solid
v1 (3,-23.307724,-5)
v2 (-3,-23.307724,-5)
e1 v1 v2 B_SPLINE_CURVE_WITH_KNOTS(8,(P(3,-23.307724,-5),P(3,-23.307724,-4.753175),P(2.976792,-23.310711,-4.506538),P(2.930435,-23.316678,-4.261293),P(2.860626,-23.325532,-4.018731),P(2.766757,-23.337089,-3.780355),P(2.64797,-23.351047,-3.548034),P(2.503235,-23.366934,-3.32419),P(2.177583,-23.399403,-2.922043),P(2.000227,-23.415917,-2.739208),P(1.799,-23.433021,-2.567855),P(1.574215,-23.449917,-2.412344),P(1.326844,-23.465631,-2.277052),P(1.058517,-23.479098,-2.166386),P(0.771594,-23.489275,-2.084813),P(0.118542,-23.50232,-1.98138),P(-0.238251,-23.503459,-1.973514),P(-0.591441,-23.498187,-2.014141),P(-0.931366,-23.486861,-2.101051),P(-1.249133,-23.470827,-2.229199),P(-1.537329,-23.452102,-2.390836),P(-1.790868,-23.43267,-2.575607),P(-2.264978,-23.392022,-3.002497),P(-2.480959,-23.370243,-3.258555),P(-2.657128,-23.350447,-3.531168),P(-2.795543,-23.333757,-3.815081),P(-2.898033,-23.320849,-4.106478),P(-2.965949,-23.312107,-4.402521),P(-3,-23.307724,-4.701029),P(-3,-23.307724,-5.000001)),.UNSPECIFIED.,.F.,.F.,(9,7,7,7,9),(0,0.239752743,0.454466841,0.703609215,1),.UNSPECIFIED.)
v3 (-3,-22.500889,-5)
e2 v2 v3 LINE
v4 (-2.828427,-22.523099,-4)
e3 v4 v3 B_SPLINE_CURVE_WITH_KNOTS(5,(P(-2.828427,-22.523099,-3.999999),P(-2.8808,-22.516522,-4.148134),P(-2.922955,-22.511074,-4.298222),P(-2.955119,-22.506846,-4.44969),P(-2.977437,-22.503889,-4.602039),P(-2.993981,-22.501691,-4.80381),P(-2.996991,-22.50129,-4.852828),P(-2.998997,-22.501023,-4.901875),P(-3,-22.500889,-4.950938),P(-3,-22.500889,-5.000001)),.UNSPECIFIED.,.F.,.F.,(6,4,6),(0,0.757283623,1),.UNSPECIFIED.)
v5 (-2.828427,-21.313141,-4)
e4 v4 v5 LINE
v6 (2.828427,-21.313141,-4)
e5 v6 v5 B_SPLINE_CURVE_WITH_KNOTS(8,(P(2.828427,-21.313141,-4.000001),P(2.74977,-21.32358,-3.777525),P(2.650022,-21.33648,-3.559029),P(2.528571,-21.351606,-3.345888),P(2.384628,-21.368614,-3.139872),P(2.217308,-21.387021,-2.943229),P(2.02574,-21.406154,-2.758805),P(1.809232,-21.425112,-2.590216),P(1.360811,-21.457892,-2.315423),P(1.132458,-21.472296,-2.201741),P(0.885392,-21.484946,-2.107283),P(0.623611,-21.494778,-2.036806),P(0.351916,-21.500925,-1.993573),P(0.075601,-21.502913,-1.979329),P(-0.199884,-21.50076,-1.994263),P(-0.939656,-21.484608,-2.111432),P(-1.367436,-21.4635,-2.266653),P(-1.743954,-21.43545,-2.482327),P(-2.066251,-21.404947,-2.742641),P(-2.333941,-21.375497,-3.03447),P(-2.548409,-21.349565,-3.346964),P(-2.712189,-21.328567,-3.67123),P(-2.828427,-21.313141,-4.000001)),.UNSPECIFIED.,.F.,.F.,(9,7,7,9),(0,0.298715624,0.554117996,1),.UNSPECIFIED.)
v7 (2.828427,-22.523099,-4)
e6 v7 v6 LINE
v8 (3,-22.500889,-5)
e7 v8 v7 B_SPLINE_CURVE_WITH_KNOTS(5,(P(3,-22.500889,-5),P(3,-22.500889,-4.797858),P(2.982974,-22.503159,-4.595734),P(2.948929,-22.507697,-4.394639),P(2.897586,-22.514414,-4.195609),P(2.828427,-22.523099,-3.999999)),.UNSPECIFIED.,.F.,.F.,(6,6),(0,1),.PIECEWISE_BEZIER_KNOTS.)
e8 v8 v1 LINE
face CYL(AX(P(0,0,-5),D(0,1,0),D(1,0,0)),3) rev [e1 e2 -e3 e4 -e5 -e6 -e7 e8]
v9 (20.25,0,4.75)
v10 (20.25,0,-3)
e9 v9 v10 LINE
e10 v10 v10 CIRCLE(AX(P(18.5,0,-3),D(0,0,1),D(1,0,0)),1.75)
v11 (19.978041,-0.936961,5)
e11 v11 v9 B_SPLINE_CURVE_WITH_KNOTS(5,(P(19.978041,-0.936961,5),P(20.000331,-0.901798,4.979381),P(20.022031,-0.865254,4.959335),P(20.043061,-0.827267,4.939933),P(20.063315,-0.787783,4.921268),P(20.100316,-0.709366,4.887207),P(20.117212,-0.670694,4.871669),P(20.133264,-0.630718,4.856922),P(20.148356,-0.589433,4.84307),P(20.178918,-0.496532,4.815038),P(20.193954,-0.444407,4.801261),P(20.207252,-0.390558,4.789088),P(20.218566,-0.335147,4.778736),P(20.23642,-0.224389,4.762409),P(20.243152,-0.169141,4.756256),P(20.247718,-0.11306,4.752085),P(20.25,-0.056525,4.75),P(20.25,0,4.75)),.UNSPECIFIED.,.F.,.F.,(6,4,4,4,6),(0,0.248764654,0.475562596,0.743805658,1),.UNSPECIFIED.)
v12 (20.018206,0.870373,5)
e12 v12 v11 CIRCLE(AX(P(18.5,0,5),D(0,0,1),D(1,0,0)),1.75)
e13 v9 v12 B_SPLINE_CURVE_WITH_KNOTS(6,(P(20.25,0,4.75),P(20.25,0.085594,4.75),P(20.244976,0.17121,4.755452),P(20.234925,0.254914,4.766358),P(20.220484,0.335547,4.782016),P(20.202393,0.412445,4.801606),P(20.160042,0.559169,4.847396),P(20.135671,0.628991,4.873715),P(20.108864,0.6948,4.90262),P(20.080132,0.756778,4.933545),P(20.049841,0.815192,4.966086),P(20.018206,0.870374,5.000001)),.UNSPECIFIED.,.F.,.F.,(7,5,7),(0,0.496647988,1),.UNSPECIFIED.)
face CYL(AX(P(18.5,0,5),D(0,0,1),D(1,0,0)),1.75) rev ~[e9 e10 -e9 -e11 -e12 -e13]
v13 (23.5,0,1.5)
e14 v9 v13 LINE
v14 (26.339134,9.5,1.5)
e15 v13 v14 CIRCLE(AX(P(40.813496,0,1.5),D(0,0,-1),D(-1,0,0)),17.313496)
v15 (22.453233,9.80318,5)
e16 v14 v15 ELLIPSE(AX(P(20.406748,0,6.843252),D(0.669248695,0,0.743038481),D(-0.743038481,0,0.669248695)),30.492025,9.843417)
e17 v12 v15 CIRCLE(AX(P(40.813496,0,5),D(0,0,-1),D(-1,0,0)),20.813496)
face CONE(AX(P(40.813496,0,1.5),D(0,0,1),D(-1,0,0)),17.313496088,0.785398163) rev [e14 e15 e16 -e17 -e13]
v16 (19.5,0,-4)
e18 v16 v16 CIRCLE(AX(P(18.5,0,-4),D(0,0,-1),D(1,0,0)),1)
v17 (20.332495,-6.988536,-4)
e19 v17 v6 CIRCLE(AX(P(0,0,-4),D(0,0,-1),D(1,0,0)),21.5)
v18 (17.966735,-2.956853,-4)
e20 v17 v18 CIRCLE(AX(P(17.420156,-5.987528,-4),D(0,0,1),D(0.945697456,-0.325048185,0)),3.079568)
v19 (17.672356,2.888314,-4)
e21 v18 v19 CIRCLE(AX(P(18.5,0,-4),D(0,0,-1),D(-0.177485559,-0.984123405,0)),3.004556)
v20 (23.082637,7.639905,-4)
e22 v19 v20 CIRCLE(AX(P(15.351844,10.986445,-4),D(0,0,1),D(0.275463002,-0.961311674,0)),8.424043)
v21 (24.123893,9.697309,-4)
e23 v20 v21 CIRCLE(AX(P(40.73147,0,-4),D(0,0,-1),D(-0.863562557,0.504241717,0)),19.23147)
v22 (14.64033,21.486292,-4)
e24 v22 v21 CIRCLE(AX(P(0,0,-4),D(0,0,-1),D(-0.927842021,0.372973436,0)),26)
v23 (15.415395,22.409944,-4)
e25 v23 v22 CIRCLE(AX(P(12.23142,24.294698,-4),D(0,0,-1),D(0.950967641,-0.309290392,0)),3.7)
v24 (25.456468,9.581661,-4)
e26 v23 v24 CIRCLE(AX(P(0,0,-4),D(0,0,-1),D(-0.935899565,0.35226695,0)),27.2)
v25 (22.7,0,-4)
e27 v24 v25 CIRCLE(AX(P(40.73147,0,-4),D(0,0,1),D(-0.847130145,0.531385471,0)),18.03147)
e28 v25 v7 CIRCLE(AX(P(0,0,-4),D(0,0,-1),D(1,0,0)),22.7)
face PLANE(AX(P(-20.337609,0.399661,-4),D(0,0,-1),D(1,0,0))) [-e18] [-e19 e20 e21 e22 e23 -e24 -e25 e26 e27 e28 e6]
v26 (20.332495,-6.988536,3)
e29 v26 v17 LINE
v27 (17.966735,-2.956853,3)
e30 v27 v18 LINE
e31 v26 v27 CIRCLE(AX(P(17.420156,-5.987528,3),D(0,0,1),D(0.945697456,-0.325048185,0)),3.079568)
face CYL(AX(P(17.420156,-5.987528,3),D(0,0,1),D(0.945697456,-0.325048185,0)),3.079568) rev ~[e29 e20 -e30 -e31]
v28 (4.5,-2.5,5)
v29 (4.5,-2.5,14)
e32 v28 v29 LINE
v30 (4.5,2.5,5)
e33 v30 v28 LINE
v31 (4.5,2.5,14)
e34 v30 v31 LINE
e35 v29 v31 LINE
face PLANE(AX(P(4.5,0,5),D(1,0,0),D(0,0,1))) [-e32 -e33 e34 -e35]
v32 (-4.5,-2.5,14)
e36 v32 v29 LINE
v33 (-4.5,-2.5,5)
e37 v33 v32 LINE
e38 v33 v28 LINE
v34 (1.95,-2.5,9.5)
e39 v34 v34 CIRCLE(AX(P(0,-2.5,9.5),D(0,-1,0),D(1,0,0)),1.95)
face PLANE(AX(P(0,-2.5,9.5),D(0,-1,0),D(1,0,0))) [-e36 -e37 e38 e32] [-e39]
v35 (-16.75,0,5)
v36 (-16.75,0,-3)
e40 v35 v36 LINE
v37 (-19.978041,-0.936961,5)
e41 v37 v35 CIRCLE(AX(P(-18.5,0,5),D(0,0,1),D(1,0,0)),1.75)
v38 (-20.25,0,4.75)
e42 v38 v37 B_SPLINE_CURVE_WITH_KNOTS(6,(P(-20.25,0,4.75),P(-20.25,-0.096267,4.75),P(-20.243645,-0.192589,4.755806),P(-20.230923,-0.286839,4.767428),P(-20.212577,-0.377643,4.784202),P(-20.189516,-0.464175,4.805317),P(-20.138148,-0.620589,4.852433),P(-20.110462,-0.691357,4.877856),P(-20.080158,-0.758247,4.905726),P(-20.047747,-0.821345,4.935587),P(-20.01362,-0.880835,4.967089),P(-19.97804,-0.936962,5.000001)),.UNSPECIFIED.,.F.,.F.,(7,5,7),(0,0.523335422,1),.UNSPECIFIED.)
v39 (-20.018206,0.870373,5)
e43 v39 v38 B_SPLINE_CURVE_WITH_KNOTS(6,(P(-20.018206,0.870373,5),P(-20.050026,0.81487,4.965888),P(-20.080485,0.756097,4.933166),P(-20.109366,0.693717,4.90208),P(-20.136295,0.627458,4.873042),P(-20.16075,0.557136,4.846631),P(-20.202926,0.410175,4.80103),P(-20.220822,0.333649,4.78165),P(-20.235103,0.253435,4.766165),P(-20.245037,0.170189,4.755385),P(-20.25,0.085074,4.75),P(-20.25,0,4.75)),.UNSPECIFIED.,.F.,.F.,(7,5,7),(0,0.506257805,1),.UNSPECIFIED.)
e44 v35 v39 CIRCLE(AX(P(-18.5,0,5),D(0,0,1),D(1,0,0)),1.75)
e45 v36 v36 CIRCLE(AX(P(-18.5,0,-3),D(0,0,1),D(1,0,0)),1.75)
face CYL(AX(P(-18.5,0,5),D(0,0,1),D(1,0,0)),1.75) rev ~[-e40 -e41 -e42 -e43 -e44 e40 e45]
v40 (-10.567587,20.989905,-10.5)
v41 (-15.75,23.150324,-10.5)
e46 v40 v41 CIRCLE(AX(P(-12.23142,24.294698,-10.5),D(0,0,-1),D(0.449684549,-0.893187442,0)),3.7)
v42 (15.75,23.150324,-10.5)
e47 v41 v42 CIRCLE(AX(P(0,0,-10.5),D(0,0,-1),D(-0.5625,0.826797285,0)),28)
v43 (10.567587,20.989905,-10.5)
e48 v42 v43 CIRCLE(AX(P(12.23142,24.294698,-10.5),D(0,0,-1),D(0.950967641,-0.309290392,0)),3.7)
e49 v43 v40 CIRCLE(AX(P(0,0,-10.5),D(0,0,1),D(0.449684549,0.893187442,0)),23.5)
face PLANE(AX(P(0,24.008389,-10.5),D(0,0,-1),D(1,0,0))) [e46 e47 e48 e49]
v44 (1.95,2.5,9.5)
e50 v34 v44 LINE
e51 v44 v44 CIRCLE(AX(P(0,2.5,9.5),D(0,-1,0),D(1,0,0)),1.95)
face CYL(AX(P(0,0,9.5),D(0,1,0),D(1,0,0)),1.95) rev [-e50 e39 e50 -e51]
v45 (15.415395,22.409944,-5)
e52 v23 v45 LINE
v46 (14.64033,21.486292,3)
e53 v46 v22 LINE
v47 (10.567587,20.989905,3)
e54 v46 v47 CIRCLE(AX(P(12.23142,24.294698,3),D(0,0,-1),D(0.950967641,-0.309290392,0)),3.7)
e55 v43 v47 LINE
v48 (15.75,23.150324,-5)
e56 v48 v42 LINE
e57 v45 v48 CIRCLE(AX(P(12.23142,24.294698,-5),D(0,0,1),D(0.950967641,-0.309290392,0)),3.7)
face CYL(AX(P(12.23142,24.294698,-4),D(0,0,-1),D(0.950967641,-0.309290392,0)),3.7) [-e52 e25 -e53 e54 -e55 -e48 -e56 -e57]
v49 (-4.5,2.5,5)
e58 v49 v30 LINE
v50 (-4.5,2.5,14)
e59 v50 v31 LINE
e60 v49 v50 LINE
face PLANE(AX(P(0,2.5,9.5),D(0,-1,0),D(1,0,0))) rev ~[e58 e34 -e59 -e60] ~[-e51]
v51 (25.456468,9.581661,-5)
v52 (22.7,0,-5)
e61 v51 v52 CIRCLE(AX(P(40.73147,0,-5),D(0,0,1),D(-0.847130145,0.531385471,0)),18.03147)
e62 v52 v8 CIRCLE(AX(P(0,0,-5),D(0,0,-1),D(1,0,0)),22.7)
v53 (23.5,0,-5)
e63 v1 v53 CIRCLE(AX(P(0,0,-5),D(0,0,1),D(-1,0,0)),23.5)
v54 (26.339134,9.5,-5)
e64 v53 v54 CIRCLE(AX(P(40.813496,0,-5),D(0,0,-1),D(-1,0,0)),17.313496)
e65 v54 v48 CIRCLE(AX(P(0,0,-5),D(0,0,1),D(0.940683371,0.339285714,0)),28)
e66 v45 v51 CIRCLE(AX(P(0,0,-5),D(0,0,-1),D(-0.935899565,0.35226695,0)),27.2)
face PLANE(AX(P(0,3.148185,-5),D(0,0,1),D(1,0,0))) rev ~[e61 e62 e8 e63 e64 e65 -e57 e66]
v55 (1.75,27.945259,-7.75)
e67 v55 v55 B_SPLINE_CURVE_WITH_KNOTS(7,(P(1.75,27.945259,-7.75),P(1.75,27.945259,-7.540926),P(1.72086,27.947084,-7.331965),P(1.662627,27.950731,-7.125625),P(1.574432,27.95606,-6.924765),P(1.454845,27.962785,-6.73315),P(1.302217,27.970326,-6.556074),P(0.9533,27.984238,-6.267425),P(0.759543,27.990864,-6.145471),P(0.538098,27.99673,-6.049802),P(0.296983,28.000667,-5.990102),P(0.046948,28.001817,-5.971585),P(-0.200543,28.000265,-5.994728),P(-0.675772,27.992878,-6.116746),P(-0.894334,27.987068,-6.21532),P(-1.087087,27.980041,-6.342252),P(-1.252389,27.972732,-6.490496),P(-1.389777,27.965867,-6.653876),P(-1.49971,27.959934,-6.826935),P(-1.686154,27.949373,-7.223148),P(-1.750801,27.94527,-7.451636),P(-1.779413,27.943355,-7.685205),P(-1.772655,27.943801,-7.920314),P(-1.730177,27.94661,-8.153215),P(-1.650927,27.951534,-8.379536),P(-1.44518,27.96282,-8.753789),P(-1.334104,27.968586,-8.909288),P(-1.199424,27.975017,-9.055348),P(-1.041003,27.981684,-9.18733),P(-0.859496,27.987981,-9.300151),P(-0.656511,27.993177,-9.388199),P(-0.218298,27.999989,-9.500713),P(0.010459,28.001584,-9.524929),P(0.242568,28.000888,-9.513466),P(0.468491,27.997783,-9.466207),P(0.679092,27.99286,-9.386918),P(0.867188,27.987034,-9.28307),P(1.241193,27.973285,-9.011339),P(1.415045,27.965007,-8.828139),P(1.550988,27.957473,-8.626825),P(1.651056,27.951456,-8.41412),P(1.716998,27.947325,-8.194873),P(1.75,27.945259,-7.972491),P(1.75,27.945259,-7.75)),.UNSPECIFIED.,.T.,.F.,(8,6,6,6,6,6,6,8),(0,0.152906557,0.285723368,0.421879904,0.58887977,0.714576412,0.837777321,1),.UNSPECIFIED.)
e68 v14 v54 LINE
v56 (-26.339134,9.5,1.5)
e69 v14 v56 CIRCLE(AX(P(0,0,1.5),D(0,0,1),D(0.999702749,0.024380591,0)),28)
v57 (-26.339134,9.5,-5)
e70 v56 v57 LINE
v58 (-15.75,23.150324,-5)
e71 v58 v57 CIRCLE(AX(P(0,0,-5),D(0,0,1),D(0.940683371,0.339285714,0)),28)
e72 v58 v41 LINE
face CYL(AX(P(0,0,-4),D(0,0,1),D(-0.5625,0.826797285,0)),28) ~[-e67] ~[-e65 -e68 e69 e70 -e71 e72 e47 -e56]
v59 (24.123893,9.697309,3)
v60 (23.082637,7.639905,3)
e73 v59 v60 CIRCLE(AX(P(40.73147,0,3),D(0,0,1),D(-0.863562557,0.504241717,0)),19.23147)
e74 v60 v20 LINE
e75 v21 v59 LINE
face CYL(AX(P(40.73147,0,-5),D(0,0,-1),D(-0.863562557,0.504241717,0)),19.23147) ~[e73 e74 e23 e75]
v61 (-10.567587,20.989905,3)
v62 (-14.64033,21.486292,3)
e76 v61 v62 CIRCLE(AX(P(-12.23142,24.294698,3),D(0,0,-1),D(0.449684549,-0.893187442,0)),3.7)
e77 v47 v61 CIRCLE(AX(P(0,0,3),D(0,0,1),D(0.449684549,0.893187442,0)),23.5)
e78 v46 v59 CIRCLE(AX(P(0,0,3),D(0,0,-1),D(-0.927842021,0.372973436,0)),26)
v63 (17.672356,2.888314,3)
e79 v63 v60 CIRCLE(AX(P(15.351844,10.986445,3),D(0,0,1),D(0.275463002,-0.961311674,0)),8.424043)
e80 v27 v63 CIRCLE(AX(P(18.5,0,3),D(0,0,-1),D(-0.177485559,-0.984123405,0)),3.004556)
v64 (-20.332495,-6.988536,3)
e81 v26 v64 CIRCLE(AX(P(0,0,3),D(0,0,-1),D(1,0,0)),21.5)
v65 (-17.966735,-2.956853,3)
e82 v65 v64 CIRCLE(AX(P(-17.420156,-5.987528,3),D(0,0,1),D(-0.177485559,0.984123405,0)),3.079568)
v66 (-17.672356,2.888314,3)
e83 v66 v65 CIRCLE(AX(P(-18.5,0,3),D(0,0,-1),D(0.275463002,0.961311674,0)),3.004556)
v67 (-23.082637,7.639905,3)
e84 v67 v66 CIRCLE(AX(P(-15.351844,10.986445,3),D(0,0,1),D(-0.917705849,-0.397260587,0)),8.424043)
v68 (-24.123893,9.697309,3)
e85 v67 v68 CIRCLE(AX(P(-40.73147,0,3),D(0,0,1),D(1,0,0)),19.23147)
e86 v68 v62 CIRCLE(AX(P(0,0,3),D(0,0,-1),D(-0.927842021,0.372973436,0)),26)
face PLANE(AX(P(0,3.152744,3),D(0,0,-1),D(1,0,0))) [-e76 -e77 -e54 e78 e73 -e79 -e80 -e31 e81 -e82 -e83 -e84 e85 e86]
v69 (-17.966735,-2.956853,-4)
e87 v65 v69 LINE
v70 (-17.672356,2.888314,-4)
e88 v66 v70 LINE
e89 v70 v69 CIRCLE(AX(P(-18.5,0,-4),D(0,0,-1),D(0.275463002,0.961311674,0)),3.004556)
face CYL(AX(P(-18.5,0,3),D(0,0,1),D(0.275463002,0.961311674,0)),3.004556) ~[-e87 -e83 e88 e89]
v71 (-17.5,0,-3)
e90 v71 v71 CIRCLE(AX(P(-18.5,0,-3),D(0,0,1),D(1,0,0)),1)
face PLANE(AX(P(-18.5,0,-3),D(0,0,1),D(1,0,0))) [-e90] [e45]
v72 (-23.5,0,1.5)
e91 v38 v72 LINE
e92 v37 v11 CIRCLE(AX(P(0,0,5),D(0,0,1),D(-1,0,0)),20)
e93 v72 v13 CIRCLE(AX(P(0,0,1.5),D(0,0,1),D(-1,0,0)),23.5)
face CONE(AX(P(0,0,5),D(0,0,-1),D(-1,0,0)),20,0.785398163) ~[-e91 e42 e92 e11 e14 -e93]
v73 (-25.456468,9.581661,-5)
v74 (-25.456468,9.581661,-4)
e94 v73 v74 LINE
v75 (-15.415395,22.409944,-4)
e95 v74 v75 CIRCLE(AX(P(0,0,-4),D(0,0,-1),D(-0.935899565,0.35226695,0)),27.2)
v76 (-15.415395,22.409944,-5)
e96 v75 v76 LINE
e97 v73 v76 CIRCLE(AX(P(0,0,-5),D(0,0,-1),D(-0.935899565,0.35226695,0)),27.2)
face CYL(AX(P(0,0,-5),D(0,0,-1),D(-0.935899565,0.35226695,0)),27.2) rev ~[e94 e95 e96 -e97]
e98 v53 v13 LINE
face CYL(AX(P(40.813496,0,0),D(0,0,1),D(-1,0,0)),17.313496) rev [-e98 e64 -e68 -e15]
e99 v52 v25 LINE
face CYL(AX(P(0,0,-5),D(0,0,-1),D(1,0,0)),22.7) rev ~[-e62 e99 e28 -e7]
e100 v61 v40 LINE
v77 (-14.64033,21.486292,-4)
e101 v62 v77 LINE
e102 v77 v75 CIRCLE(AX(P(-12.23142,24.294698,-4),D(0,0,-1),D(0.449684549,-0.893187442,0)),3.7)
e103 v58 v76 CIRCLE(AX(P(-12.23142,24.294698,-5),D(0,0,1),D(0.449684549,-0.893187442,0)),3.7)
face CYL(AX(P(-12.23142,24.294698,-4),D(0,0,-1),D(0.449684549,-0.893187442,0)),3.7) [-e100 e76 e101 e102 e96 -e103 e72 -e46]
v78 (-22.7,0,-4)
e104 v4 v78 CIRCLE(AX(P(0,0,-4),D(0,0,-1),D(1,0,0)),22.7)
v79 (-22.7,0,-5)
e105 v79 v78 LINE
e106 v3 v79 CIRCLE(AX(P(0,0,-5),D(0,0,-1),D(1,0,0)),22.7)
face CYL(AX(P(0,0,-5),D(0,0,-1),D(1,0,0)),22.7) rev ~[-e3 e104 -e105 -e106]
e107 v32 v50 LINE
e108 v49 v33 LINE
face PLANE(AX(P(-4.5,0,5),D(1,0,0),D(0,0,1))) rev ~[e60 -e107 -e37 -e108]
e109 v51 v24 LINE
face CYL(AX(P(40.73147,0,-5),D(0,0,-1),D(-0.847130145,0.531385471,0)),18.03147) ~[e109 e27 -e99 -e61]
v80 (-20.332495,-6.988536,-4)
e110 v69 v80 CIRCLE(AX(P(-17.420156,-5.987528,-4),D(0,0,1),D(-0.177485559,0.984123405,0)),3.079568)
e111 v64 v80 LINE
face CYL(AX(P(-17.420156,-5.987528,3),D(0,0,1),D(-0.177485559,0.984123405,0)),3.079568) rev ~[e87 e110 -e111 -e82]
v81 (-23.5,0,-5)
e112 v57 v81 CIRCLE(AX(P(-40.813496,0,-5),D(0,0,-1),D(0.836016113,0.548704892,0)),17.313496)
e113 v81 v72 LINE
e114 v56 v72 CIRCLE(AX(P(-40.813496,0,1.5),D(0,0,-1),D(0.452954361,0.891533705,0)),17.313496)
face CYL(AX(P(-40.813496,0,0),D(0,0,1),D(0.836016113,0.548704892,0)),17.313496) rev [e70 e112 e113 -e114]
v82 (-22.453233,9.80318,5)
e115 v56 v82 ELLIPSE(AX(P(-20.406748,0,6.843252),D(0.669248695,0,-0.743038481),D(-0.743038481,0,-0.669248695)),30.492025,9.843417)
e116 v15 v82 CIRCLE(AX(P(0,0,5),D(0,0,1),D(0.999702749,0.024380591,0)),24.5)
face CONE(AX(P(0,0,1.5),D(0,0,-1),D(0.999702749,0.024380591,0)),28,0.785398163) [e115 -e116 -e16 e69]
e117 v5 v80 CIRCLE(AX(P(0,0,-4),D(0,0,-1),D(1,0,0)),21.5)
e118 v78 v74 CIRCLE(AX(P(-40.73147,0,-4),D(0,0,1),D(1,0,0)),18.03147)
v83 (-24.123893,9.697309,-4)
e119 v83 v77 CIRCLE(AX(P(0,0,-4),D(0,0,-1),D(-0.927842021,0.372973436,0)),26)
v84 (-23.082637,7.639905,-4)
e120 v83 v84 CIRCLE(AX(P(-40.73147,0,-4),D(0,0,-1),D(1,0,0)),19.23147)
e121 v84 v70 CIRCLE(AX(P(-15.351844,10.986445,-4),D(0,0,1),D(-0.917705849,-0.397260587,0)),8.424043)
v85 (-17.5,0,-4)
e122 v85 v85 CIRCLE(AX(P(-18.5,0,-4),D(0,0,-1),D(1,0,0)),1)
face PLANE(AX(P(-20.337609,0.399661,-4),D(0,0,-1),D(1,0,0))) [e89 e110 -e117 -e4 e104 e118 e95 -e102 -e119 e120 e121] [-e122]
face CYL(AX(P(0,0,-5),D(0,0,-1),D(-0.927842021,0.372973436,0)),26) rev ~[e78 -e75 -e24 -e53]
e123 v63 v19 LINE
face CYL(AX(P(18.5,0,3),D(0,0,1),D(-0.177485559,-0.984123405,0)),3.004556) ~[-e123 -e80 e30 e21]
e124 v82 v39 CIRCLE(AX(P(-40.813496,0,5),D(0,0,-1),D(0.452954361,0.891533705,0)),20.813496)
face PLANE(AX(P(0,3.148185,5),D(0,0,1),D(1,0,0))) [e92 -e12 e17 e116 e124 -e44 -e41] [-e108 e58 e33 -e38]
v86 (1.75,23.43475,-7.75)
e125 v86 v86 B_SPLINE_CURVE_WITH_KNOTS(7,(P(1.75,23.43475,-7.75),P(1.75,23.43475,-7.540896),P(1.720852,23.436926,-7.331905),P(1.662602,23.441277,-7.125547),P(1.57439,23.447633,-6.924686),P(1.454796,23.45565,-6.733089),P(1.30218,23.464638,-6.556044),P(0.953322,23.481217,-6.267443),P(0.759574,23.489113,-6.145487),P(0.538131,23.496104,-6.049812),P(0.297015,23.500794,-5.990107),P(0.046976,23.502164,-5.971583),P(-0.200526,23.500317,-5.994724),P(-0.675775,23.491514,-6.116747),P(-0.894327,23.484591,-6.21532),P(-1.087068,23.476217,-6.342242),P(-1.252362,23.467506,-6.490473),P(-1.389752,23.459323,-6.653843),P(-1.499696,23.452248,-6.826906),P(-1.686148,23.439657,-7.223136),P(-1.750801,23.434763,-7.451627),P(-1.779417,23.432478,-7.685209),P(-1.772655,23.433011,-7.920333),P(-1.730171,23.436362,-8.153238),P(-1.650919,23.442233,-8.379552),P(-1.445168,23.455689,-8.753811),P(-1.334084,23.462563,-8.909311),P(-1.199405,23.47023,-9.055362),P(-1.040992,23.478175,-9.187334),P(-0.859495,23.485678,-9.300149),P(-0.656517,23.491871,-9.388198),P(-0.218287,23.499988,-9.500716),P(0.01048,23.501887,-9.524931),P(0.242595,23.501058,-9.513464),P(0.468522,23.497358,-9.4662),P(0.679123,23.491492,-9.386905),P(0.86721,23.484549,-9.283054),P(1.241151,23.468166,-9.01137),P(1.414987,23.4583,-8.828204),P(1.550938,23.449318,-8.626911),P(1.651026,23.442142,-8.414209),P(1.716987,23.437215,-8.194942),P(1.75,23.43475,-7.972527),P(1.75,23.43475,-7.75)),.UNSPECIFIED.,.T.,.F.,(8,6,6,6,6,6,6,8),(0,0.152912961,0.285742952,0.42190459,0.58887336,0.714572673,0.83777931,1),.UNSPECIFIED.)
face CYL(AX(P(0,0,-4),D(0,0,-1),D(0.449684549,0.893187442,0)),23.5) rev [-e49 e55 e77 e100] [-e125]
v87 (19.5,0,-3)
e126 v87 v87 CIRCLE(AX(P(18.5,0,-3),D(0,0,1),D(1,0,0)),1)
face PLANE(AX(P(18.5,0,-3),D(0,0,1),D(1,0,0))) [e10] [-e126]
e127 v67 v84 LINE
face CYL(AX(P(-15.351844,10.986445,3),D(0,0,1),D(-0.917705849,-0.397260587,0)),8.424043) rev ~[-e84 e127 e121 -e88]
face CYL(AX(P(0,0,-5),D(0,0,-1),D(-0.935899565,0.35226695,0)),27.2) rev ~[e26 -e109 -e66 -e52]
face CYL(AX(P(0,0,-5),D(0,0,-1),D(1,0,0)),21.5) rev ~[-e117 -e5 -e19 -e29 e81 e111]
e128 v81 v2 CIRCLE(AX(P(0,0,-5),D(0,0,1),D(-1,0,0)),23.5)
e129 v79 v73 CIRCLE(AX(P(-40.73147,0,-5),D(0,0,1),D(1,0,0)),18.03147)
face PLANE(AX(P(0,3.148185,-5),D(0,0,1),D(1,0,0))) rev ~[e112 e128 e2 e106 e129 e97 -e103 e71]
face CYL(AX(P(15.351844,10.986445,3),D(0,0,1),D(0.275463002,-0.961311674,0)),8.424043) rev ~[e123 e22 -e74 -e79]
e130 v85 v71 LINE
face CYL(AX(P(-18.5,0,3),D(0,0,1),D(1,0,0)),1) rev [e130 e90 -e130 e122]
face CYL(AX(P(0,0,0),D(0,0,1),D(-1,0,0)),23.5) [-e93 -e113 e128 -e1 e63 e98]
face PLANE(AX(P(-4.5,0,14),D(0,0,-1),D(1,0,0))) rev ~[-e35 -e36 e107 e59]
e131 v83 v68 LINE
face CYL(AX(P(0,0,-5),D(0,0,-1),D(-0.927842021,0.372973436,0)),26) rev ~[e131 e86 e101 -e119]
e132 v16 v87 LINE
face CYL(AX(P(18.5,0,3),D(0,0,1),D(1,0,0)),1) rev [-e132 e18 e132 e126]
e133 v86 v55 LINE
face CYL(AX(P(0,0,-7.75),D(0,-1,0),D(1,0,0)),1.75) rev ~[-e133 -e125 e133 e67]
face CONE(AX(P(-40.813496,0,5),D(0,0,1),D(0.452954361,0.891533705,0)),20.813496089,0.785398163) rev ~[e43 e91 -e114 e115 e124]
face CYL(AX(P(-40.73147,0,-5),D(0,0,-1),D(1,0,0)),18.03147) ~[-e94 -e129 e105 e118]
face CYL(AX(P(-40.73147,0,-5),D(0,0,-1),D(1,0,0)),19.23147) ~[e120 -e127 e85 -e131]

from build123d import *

# Parameters (mm, degrees)
F0_R         = 1
F1_DEPTH     = 5
F3_DEPTH     = 8
F5_DEPTH     = 1
F6_R         = 1
F7_DEPTH     = 7
F8_R         = 1.75
F9_DEPTH     = 8
F10_R        = 3
F11_DEPTH    = 23.501
F12_W        = 9
F12_H        = 9
F12_R        = 1.95
F13_DEPTH    = 2.5
F16_DEPTH    = 6.5
F17_DEPTH    = 7
F18_R        = 1.75
F19_DEPTH    = 28.001
F20_T2_ANGLE = 180
F20_T4_ANGLE = 63.0666087428
F20_T6_ANGLE = 177.2059132033
F20_T8_ANGLE = 63.0666087428


# Not quite as in the source:
# - a fillet or chamfer that OpenCascade refuses, or shapes differently, is made with other operations: its cross-section is extruded or revolved along the edge and cut away or added


with BuildPart() as f1:
    # F0 (on Top) → F1 (new body, symmetric)
    with BuildSketch(Plane.XY):
        with BuildLine():
            ThreePointArc((-26.3391343821, 9.5), (-24.2249616205, 4.9575872166), (-23.5, 0))
            ThreePointArc((-23.5, 0), (0, -23.5), (23.5, 0))
            ThreePointArc((23.5, 0), (24.2249616205, 4.9575872166), (26.3391343821, 9.5))
            ThreePointArc((26.3391343821, 9.5), (0, 28), (-26.3391343821, 9.5))
        make_face()
        with Locations((-18.5, 0)):
            Circle(F0_R, mode=Mode.SUBTRACT)
        with Locations((18.5, 0)):
            Circle(F0_R, mode=Mode.SUBTRACT)
    extrude(amount=F1_DEPTH, both=True)

    # F2 (on face) → F3 (cut)
    with BuildSketch(Plane(origin=(0, 0, -5), x_dir=(1, 0, 0), z_dir=(0, 0, -1))):
        with BuildLine():
            ThreePointArc((21.5, 0), (0, 21.5), (-21.5, 0))
            ThreePointArc((-21.5, 0), (-22.1675592341, -5.0230125511), (-24.12389255, -9.6973093298))
            ThreePointArc((-24.12389255, -9.6973093298), (0, -26), (24.12389255, -9.6973093298))
            ThreePointArc((24.12389255, -9.6973093298), (22.1675592341, -5.023012551), (21.5, 0))
        make_face()
    extrude(amount=-F3_DEPTH, mode=Mode.SUBTRACT)

    # F4 (on face) → F5 (cut)
    with BuildSketch(Plane(origin=(0, 0, -5), x_dir=(1, 0, 0), z_dir=(0, 0, -1))):
        with BuildLine():
            ThreePointArc((22.7, 0), (0, 22.7), (-22.7, 0))
            ThreePointArc((-22.7, 0), (-23.4028138558, -4.9851365308), (-25.4564681735, -9.5816610319))
            ThreePointArc((-25.4564681735, -9.5816610319), (0, -27.2), (25.4564681736, -9.5816610318))
            ThreePointArc((25.4564681736, -9.5816610318), (23.4028138558, -4.9851365307), (22.7, 0))
        make_face()
    extrude(amount=-F5_DEPTH, mode=Mode.SUBTRACT)

    # F6 (on face) → F7 (join, through all)
    with BuildSketch(Plane(origin=(0, 0, 3), x_dir=(1, 0, 0), z_dir=(0, 0, -1))):
        with BuildLine():
            ThreePointArc((-17.6723561014, -2.888314352), (-15.4992475751, 0.1511261164), (-17.9667347728, 2.9568534655))
            ThreePointArc((-17.9667347728, 2.9568534655), (-20.0762140714, 4.428973477), (-20.3324952956, 6.9885359735))
            ThreePointArc((-20.3324952956, 6.9885359735), (-22.8497447738, -0.1109553271), (-23.0826374703, -7.6399049653))
            ThreePointArc((-23.0826374703, -7.6399049653), (-20.9107637858, -4.6569183518), (-17.6723561014, -2.888314352))
        make_face()
        with Locations((-18.5, 0)):
            Circle(F6_R, mode=Mode.SUBTRACT)
        with BuildLine():
            ThreePointArc((20.3324952956, 6.9885359735), (20.0762140714, 4.428973477), (17.9667347728, 2.9568534655))
            ThreePointArc((17.9667347728, 2.9568534655), (15.4992475751, 0.1511261164), (17.6723561014, -2.888314352))
            ThreePointArc((17.6723561014, -2.888314352), (20.9107637858, -4.6569183518), (23.0826374703, -7.6399049653))
            ThreePointArc((23.0826374703, -7.6399049653), (22.9151781731, -0.0986538692), (20.3324952956, 6.9885359735))
        make_face()
        with Locations((18.5, 0)):
            Circle(F6_R, mode=Mode.SUBTRACT)
    extrude(amount=F7_DEPTH)

    # F8 (on face) → F9 (cut)
    with BuildSketch(Plane.XY.offset(5)):
        with Locations((-18.5, 0)):
            Circle(F8_R)
        with Locations((18.5, 0)):
            Circle(F8_R)
    extrude(amount=-F9_DEPTH, mode=Mode.SUBTRACT)

    # F10 (on Front) → F11 (cut, through all)
    with BuildSketch(Plane.XZ):
        with Locations((0, -5)):
            Circle(F10_R)
    extrude(amount=F11_DEPTH, mode=Mode.SUBTRACT)

    # F12 (on Front) → F13 (join, symmetric)
    with BuildSketch(Plane.XZ):
        with Locations((0, 9.5)):
            Rectangle(F12_W, F12_H)
        with Locations((0, 9.5)):
            Circle(F12_R, mode=Mode.SUBTRACT)
    extrude(amount=F13_DEPTH, both=True)

    # F15 (on face) → F16 (join)
    with BuildSketch(Plane(origin=(0, 0, -4), x_dir=(1, 0, 0), z_dir=(0, 0, -1))):
        with BuildLine():
            ThreePointArc((10.5675868988, -20.9899048863), (0, -23.5), (-10.5675868988, -20.9899048863))
            ThreePointArc((-10.5675868988, -20.9899048863), (-13.6551032171, -20.8795666046), (-15.75, -23.1503239718))
            ThreePointArc((-15.75, -23.1503239718), (0, -28), (15.75, -23.1503239718))
            ThreePointArc((15.75, -23.1503239718), (13.6551032171, -20.8795666046), (10.5675868988, -20.9899048863))
        make_face()
    extrude(amount=F16_DEPTH)

    # F15 (on face) → F17 (join, through all)
    with BuildSketch(Plane(origin=(0, 0, -4), x_dir=(1, 0, 0), z_dir=(0, 0, -1))):
        with BuildLine():
            ThreePointArc((10.5675868988, -20.9899048863), (0, -23.5), (-10.5675868988, -20.9899048863))
            ThreePointArc((-10.5675868988, -20.9899048863), (-13.6551032171, -20.8795666046), (-15.75, -23.1503239718))
            ThreePointArc((-15.75, -23.1503239718), (0, -28), (15.75, -23.1503239718))
            ThreePointArc((15.75, -23.1503239718), (13.6551032171, -20.8795666046), (10.5675868988, -20.9899048863))
        make_face()
    extrude(amount=-F17_DEPTH)

    # F18 (on Front) → F19 (cut, through all)
    with BuildSketch(Plane.XZ):
        with Locations((0, -7.75)):
            Circle(F18_R)
    extrude(amount=-F19_DEPTH, mode=Mode.SUBTRACT)

    # F20: chamfer of 3.5 on 4 edges, made by hand

    # F20_s1 → F20_t2 (revolve, cut)
    with BuildSketch(Plane.XZ):
        Polygon((-20, 5), (-23.5, 1.5), (-23.5, 5), align=None)
    revolve(axis=Axis((0, 0, 5), (0, 0, 1)), revolution_arc=F20_T2_ANGLE, mode=Mode.SUBTRACT)

    # F20_s3 → F20_t4 (revolve, cut)
    with BuildSketch(Plane.XZ):
        Polygon((23.5, 1.5), (20, 5), (23.5, 5), align=None)
    revolve(axis=Axis((40.8134960885, 0, 5), (0, 0, -1)), revolution_arc=F20_T4_ANGLE, mode=Mode.SUBTRACT)

    # F20_s5 → F20_t6 (revolve, cut)
    with BuildSketch(Plane(origin=(0, 0, 0), x_dir=(0, 0, 1), z_dir=(0.0243805911, -0.9997027492, 0))):
        Polygon((1.5, -28), (5, -24.5), (5, -28), align=None)
    revolve(axis=Axis((0, 0, 5), (0, 0, 1)), revolution_arc=F20_T6_ANGLE, mode=Mode.SUBTRACT)

    # F20_s7 → F20_t8 (revolve, cut)
    with BuildSketch(Plane(origin=(-32.4398868868, 16.4814724869, 0), x_dir=(0, 0, 1), z_dir=(-0.8915337049, 0.4529543608, 0))):
        Polygon((5, 2.326845056), (1.5, -1.173154944), (5, -1.173154944), align=None)
    revolve(axis=Axis((-40.8134960885, 0, 5), (0, 0, -1)), revolution_arc=F20_T8_ANGLE, mode=Mode.SUBTRACT)


solid = f1.part
